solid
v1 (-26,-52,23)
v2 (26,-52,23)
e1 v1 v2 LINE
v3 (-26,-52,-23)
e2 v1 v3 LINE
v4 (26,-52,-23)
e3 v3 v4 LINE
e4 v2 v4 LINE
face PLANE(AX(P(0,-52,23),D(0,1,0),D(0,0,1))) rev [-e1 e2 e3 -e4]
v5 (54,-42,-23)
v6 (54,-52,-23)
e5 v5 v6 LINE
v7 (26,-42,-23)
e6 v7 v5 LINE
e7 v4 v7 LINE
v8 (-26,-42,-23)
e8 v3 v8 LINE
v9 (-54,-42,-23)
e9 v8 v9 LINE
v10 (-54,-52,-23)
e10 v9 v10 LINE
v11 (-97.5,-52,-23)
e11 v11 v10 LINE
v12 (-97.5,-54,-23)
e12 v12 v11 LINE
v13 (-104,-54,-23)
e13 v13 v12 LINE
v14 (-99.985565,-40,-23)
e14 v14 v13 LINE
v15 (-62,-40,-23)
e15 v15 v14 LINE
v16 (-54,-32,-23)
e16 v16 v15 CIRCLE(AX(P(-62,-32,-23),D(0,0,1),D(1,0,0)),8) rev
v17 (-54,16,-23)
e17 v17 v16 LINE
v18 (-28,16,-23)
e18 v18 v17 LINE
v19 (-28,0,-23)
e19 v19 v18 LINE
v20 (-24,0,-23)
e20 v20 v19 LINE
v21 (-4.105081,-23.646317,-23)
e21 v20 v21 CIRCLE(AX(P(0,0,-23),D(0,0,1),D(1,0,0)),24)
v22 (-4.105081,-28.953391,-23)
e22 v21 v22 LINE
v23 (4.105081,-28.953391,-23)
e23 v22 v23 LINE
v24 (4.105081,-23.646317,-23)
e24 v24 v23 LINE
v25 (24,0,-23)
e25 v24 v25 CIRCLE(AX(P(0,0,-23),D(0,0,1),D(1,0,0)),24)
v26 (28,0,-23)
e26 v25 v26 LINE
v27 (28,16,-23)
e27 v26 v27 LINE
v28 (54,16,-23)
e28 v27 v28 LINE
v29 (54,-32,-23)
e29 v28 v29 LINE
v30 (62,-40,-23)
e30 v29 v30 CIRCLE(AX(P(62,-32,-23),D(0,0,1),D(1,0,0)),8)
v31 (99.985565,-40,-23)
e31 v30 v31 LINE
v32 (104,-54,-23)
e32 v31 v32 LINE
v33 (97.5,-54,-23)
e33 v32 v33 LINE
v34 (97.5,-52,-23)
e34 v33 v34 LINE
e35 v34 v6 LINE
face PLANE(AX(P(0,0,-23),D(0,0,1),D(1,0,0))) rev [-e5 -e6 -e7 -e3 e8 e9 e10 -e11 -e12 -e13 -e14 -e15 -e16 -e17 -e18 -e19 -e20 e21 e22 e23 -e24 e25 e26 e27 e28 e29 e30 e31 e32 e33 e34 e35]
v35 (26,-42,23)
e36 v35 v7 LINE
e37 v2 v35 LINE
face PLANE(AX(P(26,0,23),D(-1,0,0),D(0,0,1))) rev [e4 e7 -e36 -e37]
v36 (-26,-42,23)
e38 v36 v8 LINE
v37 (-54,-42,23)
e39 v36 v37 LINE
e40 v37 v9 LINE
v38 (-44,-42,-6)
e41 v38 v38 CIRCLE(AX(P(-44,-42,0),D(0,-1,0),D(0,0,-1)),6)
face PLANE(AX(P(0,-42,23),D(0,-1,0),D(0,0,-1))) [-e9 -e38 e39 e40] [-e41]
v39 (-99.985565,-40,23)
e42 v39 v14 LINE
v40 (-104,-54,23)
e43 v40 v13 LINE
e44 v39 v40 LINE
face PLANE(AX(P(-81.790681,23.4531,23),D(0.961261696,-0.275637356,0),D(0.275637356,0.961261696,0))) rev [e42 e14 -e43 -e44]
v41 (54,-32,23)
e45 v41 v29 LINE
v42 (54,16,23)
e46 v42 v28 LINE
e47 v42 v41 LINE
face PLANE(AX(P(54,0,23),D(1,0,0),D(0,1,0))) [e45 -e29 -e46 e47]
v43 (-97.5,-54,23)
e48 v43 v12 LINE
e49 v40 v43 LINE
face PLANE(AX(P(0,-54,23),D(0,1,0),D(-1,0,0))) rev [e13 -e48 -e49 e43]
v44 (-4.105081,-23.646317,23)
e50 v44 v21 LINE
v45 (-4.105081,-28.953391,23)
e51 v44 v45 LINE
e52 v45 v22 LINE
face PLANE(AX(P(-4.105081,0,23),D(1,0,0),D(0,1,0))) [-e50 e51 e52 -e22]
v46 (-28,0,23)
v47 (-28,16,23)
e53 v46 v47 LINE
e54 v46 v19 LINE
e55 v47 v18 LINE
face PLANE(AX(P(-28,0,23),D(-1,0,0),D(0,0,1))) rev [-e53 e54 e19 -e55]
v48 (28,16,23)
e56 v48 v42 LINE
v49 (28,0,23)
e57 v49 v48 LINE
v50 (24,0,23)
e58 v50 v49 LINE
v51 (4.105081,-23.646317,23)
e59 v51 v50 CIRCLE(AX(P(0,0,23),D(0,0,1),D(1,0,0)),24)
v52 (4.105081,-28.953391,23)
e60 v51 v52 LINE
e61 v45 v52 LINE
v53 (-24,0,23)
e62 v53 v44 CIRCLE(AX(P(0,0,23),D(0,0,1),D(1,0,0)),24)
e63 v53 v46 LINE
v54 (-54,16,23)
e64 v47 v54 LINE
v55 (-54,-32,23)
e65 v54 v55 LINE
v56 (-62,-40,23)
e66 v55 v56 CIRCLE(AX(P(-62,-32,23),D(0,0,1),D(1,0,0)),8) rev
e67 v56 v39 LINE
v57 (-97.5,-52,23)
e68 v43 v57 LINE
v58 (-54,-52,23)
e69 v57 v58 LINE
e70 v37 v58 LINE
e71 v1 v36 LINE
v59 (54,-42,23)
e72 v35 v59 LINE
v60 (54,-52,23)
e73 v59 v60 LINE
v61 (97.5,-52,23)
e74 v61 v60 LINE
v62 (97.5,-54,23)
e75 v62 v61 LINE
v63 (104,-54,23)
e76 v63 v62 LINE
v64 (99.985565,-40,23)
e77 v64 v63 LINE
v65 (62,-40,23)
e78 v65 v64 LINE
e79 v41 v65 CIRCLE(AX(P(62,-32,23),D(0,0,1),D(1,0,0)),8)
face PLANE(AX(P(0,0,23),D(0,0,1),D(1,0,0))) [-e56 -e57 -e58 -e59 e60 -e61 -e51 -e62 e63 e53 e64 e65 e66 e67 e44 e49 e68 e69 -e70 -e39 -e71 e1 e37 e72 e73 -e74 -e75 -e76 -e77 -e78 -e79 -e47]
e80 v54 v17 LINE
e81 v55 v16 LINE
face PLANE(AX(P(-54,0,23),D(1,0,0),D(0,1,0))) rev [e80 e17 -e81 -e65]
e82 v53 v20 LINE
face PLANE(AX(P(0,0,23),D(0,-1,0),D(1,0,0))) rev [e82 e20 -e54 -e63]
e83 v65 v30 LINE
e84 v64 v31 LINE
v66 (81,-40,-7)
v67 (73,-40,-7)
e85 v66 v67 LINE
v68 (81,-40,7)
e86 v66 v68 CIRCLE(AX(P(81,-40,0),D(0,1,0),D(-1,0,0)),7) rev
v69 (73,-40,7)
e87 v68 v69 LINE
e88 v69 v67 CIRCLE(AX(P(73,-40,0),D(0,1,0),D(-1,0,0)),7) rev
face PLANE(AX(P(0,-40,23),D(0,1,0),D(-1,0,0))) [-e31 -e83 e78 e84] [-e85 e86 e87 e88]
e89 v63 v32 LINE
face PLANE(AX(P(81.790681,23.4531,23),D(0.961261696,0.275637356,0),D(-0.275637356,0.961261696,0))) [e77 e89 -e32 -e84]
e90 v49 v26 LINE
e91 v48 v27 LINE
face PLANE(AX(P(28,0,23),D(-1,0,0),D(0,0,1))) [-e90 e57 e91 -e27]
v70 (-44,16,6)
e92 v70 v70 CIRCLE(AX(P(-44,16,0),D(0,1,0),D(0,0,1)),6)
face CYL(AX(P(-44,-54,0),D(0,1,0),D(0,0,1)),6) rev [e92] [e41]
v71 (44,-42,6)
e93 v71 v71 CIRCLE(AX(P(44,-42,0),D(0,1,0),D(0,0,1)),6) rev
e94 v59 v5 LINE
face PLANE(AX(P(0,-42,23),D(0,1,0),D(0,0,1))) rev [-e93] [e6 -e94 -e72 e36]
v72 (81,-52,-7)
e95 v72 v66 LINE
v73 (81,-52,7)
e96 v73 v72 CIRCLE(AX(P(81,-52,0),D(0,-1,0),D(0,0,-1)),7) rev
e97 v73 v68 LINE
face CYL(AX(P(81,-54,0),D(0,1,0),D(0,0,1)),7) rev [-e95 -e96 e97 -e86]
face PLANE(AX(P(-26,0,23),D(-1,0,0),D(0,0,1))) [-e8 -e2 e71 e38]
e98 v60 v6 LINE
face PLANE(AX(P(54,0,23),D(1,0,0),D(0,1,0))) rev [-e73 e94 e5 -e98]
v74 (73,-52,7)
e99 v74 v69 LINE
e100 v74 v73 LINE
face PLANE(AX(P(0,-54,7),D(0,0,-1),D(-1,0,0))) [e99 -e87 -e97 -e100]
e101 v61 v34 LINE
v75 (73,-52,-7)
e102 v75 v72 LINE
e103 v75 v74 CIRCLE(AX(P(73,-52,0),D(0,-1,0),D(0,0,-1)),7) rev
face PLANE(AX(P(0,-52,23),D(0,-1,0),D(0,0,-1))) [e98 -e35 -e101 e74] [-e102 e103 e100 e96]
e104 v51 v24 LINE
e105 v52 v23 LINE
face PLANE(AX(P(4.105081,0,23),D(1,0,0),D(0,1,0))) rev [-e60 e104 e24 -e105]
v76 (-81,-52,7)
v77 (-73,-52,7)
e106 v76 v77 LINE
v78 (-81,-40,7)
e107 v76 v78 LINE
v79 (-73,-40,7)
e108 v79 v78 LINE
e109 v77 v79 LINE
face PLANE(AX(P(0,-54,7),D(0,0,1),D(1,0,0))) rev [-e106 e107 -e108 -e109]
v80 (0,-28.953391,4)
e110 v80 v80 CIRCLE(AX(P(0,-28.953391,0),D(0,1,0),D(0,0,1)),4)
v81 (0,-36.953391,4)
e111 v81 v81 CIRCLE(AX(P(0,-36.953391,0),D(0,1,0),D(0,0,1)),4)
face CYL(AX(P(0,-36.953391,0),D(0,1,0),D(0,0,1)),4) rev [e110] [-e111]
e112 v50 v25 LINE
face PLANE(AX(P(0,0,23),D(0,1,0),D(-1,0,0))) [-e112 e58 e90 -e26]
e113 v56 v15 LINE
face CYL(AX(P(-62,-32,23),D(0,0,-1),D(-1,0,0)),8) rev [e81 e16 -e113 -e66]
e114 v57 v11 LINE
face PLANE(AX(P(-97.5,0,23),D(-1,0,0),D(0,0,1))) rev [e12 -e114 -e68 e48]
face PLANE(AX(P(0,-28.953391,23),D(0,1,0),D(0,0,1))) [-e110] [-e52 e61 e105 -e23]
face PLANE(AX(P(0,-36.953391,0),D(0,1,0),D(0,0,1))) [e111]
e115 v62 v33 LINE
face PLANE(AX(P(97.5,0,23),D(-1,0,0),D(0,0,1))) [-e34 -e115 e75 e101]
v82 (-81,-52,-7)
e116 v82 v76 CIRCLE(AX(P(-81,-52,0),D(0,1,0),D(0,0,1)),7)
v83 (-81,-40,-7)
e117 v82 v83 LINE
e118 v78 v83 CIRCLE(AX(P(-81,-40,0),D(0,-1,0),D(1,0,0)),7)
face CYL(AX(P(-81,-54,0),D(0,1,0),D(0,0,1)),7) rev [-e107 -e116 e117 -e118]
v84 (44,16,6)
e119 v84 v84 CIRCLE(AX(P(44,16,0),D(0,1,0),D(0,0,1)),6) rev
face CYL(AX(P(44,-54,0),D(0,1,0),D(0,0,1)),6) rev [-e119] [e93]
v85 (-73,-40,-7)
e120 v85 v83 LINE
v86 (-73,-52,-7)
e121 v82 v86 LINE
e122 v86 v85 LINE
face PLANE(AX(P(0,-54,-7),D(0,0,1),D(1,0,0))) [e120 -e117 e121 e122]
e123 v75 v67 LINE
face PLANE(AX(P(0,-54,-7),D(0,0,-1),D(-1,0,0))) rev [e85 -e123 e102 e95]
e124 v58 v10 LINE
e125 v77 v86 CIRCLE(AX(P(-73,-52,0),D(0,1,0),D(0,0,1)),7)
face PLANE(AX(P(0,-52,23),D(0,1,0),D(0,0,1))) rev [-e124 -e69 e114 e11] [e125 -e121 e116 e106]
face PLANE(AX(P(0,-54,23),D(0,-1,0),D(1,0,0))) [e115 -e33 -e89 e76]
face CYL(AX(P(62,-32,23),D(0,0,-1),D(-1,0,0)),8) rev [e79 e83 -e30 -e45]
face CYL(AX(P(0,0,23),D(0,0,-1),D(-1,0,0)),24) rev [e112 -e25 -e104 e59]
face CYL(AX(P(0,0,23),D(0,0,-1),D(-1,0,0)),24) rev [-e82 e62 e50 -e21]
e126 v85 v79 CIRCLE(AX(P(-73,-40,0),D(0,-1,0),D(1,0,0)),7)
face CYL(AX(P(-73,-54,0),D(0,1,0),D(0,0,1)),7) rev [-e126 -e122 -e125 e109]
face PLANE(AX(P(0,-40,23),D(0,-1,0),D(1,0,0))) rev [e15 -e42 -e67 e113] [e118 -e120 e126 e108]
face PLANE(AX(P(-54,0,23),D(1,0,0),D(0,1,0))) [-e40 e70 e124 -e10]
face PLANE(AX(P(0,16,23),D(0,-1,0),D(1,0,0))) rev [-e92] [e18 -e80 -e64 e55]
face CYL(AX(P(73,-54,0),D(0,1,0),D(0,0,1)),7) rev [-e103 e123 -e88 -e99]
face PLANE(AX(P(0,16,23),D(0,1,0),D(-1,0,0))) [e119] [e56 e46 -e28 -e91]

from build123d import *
from OCP.BRepAlgoAPI import BRepAlgoAPI_Cut
from OCP.TopTools import TopTools_ListOfShape

# Parameters (mm, degrees)
BOSS_EXTRUDE1_DEPTH     = 23
CUT_EXTRUDE1_DEPTH      = 120.419428905
CUT_EXTRUDE1_DEPTH_BACK = 120.419428905
SKETCH2_R               = 6
CUT_EXTRUDE4_START      = -28.953391
SKETCH2_3_R             = 4
CUT_EXTRUDE4_DEPTH      = 8


with BuildPart() as part:
    # Sketch1 → Boss-Extrude1 (new, symmetric)
    with BuildSketch(Plane.XY):
        with BuildLine():
            ThreePointArc((-4.105081288, -23.646316999), (-18.364666495, -15.451181979), (-24, 0))
            Line((-24, 0), (-28, 0))
            Line((-28, 0), (-28, 16))
            Line((-28, 16), (-54, 16))
            Line((-54, 16), (-54, -32))
            ThreePointArc((-54, -32), (-56.343145751, -37.656854249), (-62, -40))
            Line((-62, -40), (-99.985564599, -40))
            Line((-99.985564599, -40), (-104, -54))
            Line((-104, -54), (-97.5, -54))
            Line((-97.5, -54), (-97.5, -52))
            Line((-97.5, -52), (-59.034606353, -52))
            Line((-59.034606353, -52), (-54, -52))
            Line((-54, -52), (-54, -42))
            Line((-54, -42), (-26, -42))
            Line((-26, -42), (-26, -52))
            Line((-26, -52), (26, -52))
            Line((26, -52), (26, -42))
            Line((26, -42), (54, -42))
            Line((54, -42), (54, -52))
            Line((54, -52), (97.5, -52))
            Line((97.5, -52), (97.5, -54))
            Line((97.5, -54), (104, -54))
            Line((104, -54), (99.985564599, -40))
            Line((99.985564599, -40), (62, -40))
            ThreePointArc((62, -40), (56.343145751, -37.656854249), (54, -32))
            Line((54, -32), (54, 16))
            Line((54, 16), (28, 16))
            Line((28, 16), (28, 0))
            Line((28, 0), (24, 0))
            ThreePointArc((24, 0), (18.364666495, -15.451181979), (4.105081288, -23.646316999))
            Line((4.105081288, -23.646316999), (4.105081288, -28.953390601))
            Line((4.105081288, -28.953390601), (-4.105081288, -28.953390601))
            Line((-4.105081288, -28.953390601), (-4.105081288, -23.646316999))
        make_face()
    extrude(amount=BOSS_EXTRUDE1_DEPTH, both=True)

    # Sketch2 → Cut-Extrude1 (cut, two sides: drawn at the far end of the back side and taken through both)
    with BuildSketch(Plane(origin=(0, 0, 0), x_dir=(1, 0, 0), z_dir=(0, 1, 0)).offset(-CUT_EXTRUDE1_DEPTH_BACK)):
        with BuildLine():
            Line((-81, -7), (-73, -7))
            ThreePointArc((-73, -7), (-66, 0), (-73, 7))
            Line((-73, 7), (-81, 7))
            ThreePointArc((-81, 7), (-88, 0), (-81, -7))
        make_face()
        with BuildLine():
            ThreePointArc((73, -7), (66, 0), (73, 7))
            Line((73, 7), (81, 7))
            ThreePointArc((81, 7), (88, 0), (81, -7))
            Line((81, -7), (73, -7))
        make_face()
        with Locations(Location((44, 0, 0), (0, 0, 270))):
            Circle(SKETCH2_R)
        with Locations(Location((-44, 0, 0), (0, 0, 270))):
            Circle(SKETCH2_R)
    extrude(amount=CUT_EXTRUDE1_DEPTH + CUT_EXTRUDE1_DEPTH_BACK, mode=Mode.SUBTRACT)


with BuildPart() as cut_extrude4_tool:
    # Sketch2<3> → Cut-Extrude4 (new body)
    with BuildSketch(Plane(origin=(0, 0, 0), x_dir=(1, 0, 0), z_dir=(0, 1, 0)).offset(CUT_EXTRUDE4_START)):
        with Locations(Location((0, 0, 0), (0, 0, 270))):
            Circle(SKETCH2_3_R)
    extrude(amount=-CUT_EXTRUDE4_DEPTH)


with BuildPart() as part_1:
    add(part.part)

    # Cut-Extrude4: cut by cut_extrude4_tool, with a tolerance
    cut_extrude4_stock = TopTools_ListOfShape()
    cut_extrude4_stock.Append(part_1.part.wrapped)
    cut_extrude4_tools = TopTools_ListOfShape()
    cut_extrude4_tools.Append(cut_extrude4_tool.part.wrapped)
    cut_extrude4_cut = BRepAlgoAPI_Cut()
    cut_extrude4_cut.SetArguments(cut_extrude4_stock)
    cut_extrude4_cut.SetTools(cut_extrude4_tools)
    cut_extrude4_cut.SetFuzzyValue(0.00001)
    cut_extrude4_cut.Build()
    add(Compound.cast(cut_extrude4_cut.Shape()).solids(), mode=Mode.REPLACE)


solid = part_1.part
